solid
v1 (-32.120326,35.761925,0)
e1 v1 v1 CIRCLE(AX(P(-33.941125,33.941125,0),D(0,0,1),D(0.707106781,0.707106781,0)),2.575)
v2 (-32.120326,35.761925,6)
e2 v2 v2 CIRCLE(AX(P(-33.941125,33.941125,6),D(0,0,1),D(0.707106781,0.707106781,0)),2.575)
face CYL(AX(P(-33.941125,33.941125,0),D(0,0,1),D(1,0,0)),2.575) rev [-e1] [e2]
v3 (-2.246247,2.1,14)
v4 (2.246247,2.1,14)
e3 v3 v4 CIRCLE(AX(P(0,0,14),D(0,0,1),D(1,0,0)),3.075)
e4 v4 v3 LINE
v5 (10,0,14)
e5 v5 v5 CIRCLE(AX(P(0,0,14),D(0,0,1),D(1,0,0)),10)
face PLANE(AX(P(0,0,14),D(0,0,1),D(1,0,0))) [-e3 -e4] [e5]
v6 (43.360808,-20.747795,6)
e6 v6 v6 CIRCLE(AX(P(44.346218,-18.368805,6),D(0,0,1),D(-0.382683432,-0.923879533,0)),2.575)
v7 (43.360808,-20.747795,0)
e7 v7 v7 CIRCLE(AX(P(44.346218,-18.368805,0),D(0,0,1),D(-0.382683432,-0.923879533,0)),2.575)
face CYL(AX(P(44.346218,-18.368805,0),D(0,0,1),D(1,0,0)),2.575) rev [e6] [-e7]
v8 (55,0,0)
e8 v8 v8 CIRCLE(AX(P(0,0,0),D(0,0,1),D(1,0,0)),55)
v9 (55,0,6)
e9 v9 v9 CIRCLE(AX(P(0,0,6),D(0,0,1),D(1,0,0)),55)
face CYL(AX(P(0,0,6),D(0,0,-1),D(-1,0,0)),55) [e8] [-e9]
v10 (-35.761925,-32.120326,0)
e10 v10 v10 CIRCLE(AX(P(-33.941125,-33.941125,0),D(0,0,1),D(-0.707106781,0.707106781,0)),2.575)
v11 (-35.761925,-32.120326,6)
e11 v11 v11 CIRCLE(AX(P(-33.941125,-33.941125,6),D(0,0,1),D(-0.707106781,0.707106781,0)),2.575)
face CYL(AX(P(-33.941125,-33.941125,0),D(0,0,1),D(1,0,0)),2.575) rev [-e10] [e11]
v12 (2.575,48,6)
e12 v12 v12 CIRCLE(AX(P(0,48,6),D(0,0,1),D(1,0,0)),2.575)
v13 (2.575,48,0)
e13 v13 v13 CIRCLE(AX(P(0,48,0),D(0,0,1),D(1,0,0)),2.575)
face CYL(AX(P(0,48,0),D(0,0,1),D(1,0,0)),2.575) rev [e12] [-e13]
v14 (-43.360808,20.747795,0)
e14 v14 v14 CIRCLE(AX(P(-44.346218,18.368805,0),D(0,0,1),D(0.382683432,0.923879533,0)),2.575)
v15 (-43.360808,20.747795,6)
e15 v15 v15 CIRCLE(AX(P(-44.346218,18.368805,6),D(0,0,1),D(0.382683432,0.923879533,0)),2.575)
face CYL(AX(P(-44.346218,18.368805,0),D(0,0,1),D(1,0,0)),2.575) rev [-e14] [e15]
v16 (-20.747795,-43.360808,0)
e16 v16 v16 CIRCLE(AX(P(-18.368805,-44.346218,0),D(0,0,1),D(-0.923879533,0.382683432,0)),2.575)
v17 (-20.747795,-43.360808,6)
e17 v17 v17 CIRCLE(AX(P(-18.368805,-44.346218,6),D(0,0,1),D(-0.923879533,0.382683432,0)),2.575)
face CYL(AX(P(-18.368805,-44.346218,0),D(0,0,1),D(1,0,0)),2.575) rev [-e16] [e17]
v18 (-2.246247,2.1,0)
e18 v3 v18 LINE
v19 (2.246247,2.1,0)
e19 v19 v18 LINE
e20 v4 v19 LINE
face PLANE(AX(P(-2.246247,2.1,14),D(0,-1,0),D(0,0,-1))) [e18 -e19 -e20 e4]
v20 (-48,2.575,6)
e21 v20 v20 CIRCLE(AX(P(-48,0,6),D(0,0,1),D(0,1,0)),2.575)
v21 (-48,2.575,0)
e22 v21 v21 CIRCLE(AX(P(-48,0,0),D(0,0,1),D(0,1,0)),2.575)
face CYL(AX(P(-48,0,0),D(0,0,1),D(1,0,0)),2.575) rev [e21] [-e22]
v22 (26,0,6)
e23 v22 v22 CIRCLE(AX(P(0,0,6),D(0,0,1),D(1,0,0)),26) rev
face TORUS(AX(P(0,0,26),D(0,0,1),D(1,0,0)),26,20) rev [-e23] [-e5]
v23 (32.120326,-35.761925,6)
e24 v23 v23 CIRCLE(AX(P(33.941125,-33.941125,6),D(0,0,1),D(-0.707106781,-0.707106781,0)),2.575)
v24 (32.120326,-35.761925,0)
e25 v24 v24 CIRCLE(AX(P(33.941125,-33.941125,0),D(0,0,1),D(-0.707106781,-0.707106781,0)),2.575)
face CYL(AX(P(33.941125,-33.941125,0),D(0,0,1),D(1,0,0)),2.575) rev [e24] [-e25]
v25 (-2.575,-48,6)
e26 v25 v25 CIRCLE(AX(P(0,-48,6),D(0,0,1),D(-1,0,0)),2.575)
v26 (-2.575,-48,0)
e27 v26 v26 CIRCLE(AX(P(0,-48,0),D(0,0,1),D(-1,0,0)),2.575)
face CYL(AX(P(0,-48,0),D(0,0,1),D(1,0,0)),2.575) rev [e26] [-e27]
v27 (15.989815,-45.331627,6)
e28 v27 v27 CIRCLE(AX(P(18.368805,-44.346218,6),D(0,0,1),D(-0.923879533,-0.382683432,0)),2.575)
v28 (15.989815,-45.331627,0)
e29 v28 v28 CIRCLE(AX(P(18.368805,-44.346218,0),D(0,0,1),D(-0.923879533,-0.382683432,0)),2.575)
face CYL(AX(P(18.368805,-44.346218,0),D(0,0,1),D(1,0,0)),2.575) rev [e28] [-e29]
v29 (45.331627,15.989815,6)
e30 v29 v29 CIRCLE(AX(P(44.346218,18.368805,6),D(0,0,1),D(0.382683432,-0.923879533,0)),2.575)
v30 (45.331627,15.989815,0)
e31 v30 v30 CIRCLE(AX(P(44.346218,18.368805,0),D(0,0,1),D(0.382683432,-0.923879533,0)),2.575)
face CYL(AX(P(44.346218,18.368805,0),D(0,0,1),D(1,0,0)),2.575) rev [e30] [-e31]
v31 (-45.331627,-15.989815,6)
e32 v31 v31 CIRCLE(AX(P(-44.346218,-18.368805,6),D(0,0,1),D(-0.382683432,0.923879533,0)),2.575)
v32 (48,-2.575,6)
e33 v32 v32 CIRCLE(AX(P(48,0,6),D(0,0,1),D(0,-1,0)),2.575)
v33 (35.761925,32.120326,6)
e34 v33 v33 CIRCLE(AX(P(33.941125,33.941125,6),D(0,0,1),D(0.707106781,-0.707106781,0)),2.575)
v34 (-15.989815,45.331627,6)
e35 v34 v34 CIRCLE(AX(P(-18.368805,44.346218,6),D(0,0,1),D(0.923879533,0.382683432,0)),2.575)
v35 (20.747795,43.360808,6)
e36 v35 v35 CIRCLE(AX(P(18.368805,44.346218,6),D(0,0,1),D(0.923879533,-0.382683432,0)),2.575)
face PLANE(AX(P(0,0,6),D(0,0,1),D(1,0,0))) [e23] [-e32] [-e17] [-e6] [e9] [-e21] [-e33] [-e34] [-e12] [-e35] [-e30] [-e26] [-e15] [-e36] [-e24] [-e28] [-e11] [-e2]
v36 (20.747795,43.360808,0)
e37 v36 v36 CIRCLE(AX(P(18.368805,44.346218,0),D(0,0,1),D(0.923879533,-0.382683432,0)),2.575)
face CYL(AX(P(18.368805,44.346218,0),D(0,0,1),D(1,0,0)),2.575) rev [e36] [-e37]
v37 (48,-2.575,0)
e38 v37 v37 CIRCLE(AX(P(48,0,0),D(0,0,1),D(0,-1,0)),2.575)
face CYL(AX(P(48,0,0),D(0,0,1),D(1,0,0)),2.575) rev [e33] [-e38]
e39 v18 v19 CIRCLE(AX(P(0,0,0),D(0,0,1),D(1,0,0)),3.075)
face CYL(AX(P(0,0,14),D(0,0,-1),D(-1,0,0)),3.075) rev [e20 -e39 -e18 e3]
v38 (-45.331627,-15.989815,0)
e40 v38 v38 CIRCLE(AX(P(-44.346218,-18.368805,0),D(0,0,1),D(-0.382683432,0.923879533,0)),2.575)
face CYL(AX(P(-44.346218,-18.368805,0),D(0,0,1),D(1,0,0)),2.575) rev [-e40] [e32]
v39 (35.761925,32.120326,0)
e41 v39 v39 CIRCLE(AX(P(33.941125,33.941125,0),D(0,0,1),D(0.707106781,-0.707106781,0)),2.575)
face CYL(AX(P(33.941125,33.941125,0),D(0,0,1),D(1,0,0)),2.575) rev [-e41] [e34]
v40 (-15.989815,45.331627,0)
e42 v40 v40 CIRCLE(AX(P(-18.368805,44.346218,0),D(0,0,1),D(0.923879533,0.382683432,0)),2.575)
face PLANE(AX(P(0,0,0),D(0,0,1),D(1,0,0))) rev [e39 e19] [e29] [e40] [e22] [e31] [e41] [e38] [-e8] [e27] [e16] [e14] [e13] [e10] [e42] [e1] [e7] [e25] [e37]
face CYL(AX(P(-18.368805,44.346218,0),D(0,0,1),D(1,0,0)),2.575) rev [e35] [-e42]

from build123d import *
from build123d.topology import SkipClean

# Parameters (mm, degrees)
ESBO_O1_R                = 55
RESSALTO_EXTRUS_O1_DEPTH = 6
ESBO_O2_R                = 10
RESSALTO_EXTRUS_O2_DEPTH = 8
FILETE3_R                = 20
ESBO_O3_R                = 2.575
CORTE_EXTRUS_O1_DEPTH    = 79.192071209
PADR_OCIRCULAR1_COUNT    = 16
CORTE_EXTRUS_O2_DEPTH    = 79.192071209


with BuildPart() as part:
    # Esboço1 → Ressalto-extrusão1 (new body)
    with BuildSketch(Plane.XY):
        Circle(ESBO_O1_R)
    extrude(amount=RESSALTO_EXTRUS_O1_DEPTH)

    # Esboço2 → Ressalto-extrusão2 (add)
    with BuildSketch(Plane.XY.offset(6)):
        Circle(ESBO_O2_R)
        with BuildLine():
            Line((-2.24624687, 2.1), (2.24624687, 2.1))
            ThreePointArc((2.24624687, 2.1), (0, -3.075), (-2.24624687, 2.1))
        make_face(mode=Mode.SUBTRACT)
    extrude(amount=RESSALTO_EXTRUS_O2_DEPTH)

    # Filete3
    # the kernel refuses this fillet: 20 mm, written as the material it adds along each edge
    with BuildSketch(Plane(origin=(0, 0, 6), x_dir=(1, 0, 0), z_dir=(0, -1, 0))) as filete3_piece_1:
        with BuildLine():
            CenterArc((26, 20), FILETE3_R, 216.869897646, 53.130102354)
            Line((10, 8), (9.68, 7.76))
            ThreePointArc((9.68, 7.76), (9.6, 4), (9.6, 0))
            Line((9.6, 0), (10, -0.4))
            Line((10, -0.4), (26, -0.4))
            Line((26, -0.4), (26, 0))
        make_face()
    revolve(axis=Axis((0, 0, 6), (0, 0, 1)))

    # Esboço3 → Corte-extrusão1 (cut, through all)
    with BuildSketch(Plane.XY.offset(6)):
        with Locations((0, 48)):
            Circle(ESBO_O3_R)
    corte_extrus_o1 = extrude(amount=-CORTE_EXTRUS_O1_DEPTH, mode=Mode.SUBTRACT)

    # PadrãoCircular1: Corte-extrusão1 ×16 about axis
    padr_ocircular1_axis = Axis((0, 0, 0), (0, 0, 1))
    for i in range(1, PADR_OCIRCULAR1_COUNT):
        add(corte_extrus_o1.rotate(padr_ocircular1_axis, i * 360 / PADR_OCIRCULAR1_COUNT), mode=Mode.SUBTRACT)

    # Esboço4 → Corte-extrusão2 (cut, through all)
    with SkipClean():  # the faces are left unmerged after this step: merging them gives an invalid solid
        with BuildSketch(Plane.XY.offset(6)):
            with BuildLine():
                Line((2.24624687, 2.1), (-2.24624687, 2.1))
                ThreePointArc((-2.24624687, 2.1), (0, -3.075), (2.24624687, 2.1))
            make_face()
        extrude(amount=-CORTE_EXTRUS_O2_DEPTH, mode=Mode.SUBTRACT)
    add(part.part.scale(1), mode=Mode.REPLACE)  # the faces are merged on a copy


solid = part.part
